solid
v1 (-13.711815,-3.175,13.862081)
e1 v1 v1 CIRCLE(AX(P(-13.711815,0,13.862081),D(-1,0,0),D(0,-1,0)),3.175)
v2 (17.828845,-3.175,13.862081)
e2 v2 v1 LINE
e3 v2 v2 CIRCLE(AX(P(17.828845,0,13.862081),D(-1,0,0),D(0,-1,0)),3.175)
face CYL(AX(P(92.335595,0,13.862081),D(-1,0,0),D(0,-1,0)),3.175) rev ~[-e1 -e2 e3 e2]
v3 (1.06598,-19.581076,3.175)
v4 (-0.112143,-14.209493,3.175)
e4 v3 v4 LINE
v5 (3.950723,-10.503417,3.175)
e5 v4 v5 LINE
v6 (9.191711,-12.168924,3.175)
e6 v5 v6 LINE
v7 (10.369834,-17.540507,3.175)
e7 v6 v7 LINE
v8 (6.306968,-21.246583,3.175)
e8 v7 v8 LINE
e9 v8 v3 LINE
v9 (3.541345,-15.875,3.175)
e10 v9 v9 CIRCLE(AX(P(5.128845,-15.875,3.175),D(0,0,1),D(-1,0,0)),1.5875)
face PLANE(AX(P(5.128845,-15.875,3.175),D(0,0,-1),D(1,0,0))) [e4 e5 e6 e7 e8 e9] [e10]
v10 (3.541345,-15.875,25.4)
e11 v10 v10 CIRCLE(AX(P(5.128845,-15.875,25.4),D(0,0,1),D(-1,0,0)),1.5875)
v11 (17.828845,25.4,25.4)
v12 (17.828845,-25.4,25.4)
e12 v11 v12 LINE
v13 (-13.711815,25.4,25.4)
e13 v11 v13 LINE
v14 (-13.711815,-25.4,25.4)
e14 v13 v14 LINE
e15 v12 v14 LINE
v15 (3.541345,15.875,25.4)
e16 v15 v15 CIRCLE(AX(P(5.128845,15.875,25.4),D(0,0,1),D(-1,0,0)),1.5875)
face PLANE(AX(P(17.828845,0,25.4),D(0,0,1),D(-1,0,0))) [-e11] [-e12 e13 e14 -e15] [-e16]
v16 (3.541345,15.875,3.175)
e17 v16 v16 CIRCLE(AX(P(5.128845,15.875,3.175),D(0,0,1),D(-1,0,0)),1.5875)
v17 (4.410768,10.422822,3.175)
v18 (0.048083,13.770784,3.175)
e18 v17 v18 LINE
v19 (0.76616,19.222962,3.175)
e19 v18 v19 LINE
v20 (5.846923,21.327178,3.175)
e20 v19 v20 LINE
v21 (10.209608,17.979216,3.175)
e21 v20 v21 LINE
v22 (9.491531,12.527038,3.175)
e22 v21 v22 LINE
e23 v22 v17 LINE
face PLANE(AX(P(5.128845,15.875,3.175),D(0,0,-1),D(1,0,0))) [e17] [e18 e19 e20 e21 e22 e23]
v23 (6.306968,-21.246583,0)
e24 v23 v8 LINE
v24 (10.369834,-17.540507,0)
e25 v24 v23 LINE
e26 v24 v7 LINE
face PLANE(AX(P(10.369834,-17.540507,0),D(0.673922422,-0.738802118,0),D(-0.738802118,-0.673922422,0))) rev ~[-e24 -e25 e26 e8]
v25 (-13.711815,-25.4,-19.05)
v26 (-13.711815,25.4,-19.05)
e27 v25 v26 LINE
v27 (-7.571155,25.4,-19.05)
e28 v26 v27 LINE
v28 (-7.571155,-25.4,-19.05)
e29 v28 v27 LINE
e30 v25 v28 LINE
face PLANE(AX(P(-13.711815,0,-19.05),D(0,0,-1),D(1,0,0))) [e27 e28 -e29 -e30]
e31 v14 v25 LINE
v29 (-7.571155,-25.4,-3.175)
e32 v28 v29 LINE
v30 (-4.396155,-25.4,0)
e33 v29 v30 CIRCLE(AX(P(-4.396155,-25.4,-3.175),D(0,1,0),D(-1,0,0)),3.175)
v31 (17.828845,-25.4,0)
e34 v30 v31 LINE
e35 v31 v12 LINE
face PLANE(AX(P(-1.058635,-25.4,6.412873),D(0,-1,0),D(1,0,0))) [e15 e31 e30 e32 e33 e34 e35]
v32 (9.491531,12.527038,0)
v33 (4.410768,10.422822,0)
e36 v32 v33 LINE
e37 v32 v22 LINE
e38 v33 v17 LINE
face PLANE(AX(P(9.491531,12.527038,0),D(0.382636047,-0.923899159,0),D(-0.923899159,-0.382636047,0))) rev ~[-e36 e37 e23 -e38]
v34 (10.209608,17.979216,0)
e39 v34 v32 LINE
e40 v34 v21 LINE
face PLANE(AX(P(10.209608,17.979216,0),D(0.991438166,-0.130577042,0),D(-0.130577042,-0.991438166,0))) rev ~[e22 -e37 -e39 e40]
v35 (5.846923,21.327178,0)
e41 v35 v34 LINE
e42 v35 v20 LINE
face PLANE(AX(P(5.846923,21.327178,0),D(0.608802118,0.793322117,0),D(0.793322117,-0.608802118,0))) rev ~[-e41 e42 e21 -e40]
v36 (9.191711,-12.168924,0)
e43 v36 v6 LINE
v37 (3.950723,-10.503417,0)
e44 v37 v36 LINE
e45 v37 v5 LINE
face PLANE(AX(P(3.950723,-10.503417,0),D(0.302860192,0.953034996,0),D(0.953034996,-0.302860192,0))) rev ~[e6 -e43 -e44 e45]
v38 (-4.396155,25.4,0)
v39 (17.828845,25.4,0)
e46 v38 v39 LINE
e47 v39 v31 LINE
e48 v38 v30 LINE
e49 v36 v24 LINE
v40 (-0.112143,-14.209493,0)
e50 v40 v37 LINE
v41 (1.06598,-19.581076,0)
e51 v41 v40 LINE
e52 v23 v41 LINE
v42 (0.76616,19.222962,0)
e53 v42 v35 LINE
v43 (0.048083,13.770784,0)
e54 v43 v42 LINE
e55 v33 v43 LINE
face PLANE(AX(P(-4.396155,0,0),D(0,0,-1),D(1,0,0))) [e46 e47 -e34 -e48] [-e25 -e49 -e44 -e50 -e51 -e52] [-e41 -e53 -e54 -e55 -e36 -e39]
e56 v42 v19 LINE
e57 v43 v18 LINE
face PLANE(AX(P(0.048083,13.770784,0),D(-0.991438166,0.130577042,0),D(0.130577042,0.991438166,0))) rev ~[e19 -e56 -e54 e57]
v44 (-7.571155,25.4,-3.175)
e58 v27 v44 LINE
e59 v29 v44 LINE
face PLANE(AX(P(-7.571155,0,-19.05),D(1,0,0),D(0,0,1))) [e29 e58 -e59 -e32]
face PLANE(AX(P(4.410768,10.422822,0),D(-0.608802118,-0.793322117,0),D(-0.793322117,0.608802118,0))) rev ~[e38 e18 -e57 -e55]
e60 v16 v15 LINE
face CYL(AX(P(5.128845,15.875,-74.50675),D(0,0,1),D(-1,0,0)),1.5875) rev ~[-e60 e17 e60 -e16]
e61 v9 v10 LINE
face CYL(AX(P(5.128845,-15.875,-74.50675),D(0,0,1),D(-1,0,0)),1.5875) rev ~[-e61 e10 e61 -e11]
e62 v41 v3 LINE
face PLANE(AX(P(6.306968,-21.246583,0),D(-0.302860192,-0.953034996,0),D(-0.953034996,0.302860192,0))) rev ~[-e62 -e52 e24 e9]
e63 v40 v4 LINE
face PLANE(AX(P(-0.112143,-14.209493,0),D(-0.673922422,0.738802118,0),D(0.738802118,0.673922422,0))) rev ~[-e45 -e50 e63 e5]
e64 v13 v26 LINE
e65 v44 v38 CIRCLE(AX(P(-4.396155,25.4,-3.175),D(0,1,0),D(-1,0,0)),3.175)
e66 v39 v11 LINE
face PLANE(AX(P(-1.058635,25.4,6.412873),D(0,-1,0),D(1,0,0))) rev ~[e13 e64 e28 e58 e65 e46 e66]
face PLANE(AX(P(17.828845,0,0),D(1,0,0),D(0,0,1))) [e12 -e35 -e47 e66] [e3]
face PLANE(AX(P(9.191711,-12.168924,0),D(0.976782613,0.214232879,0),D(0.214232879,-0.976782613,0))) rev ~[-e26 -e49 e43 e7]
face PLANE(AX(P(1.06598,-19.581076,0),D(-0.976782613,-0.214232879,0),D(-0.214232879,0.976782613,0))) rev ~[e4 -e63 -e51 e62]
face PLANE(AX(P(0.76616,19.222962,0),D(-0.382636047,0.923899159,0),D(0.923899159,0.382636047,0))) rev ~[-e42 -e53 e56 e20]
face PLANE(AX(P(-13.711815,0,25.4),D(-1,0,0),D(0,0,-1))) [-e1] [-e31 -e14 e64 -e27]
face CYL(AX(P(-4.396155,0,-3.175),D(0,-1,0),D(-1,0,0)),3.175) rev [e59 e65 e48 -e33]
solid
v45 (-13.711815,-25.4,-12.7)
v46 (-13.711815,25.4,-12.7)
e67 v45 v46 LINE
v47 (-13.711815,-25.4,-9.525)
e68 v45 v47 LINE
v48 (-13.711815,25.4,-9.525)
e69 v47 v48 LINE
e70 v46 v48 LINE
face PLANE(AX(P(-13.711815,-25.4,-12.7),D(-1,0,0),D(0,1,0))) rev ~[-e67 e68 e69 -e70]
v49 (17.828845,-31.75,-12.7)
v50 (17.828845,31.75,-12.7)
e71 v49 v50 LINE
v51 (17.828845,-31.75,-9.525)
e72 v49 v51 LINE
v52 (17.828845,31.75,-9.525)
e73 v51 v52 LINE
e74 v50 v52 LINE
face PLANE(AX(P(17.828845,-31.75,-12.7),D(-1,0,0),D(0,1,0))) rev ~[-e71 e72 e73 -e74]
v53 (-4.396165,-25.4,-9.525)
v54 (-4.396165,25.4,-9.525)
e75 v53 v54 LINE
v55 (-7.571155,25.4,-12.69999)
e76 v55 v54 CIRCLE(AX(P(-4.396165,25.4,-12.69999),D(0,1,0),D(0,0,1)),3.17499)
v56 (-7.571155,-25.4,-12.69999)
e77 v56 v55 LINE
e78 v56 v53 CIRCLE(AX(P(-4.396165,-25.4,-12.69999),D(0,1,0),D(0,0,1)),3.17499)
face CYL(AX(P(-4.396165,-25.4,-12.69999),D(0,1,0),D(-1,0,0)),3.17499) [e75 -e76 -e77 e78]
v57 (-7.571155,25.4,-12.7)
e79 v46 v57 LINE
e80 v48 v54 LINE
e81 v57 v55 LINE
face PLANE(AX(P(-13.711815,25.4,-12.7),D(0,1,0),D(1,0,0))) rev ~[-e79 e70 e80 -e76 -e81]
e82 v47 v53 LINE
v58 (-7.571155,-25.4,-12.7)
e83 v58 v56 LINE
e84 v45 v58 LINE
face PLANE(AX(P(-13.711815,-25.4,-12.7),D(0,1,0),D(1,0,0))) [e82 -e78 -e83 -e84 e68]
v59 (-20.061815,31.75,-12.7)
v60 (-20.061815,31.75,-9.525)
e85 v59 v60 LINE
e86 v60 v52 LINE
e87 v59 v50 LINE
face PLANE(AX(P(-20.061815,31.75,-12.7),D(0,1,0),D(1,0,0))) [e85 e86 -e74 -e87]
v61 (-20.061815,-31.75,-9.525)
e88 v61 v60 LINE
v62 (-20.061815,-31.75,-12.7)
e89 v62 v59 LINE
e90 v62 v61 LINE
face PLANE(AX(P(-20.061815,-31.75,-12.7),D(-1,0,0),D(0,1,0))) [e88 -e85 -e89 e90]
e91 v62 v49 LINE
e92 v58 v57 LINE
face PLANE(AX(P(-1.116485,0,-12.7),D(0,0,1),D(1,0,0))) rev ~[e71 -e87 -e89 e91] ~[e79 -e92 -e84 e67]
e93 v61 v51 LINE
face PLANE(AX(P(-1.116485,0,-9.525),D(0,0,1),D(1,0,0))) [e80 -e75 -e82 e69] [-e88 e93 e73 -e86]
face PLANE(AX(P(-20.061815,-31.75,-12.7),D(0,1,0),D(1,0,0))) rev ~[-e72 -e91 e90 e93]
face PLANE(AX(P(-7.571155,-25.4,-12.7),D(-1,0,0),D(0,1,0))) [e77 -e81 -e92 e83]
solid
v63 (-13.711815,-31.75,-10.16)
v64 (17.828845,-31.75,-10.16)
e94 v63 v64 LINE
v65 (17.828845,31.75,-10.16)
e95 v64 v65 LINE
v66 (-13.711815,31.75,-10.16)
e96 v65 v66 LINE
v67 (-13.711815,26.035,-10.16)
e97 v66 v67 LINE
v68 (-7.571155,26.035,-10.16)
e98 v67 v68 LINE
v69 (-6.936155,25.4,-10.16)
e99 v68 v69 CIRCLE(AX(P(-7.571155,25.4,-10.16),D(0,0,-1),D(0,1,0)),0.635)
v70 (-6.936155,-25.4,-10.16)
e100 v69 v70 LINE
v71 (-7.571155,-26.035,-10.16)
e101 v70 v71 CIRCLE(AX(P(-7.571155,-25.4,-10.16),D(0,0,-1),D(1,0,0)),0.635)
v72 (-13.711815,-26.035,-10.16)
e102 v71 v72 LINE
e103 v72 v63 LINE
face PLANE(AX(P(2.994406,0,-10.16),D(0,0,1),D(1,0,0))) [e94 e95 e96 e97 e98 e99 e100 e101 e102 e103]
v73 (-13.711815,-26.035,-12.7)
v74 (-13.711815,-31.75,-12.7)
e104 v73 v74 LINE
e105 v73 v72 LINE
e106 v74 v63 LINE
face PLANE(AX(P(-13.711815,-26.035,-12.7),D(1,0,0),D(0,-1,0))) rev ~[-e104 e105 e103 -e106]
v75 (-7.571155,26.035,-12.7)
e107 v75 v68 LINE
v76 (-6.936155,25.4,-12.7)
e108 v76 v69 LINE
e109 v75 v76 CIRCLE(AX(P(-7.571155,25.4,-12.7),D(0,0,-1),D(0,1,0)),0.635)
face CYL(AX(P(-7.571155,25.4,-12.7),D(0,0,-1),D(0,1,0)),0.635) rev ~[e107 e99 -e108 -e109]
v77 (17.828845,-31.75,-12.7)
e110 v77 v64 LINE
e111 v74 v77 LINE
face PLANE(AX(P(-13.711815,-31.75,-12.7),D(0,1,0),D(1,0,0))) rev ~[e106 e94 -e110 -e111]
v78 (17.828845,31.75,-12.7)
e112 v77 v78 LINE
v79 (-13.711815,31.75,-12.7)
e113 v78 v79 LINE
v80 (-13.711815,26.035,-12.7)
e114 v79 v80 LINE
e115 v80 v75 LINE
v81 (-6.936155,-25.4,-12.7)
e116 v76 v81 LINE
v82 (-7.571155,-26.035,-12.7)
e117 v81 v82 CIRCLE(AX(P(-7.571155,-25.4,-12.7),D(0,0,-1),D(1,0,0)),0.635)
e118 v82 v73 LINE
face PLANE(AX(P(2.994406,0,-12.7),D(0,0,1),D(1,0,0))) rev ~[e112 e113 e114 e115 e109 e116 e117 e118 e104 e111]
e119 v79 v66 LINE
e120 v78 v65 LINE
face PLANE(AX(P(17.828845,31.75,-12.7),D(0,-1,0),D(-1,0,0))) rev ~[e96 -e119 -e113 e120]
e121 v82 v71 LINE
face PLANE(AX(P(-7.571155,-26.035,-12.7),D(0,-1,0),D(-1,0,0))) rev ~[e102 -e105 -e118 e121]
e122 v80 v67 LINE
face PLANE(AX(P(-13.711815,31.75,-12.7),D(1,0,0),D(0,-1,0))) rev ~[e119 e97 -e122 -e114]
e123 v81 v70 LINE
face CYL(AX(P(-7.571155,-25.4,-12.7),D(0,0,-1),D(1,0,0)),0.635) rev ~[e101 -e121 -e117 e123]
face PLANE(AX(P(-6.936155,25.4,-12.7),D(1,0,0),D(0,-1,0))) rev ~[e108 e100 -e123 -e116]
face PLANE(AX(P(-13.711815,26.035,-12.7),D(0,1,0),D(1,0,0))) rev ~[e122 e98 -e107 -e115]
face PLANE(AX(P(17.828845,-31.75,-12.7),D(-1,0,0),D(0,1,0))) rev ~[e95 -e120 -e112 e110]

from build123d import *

# Parameters (mm, degrees)
F1_DEPTH  = 25.4
F3_D      = 6.35
F6_DEPTH  = 3.175
F7_D      = 3.175
F10_DEPTH = 2.54
F11_W     = 37.8906604153
F11_H     = 63.5
F11_W_2   = 6.1406604153
F11_H_2   = 50.8
F12_DEPTH = 3.175
F13_R     = 3.17499


# Not quite as in the source:
# - a fillet or chamfer is up to 0.001 mm smaller than in the source, because OpenCascade refuses the exact size


with BuildPart() as f1:
    # F0 (on Front) → F1 (new body, symmetric)
    with BuildSketch(Plane.XZ):
        with BuildLine():
            ThreePointArc((-7.5711545896, -3.175), (-6.6412186199, -0.9299359697), (-4.3961545896, 0))
            Line((-4.3961545896, 0), (17.8288454104, 0))
            Line((17.8288454104, 0), (17.8288454104, 25.4))
            Line((17.8288454104, 25.4), (-13.7118150049, 25.4))
            Line((-13.7118150049, 25.4), (-13.7118150049, -19.05))
            Line((-13.7118150049, -19.05), (-7.5711545896, -19.05))
            Line((-7.5711545896, -19.05), (-7.5711545896, -3.175))
        make_face()
    extrude(amount=F1_DEPTH, both=True)

    # F3 (through all)
    with Locations(Plane.YZ.offset(17.8288454104)):
        with Locations((0, 13.8620808721)):
            Hole(F3_D / 2)

    # F5 (on face) → F6 (cut)
    with BuildSketch(Plane(origin=(0, 0, 0), x_dir=(1, 0, 0), z_dir=(0, 0, -1))):
        Polygon((3.950722829, 10.5034171622), (9.1917113157, 12.1689244969), (10.3698338971, 17.5405073346), (6.3069679918, 21.2465828378), (1.065979505, 19.5810755031), (-0.1121430764, 14.2094926654), align=None)
        Polygon((0.7661597851, -19.2229619375), (5.8469226865, -21.327177549), (10.2096083118, -17.9792156115), (9.4915310357, -12.5270380625), (4.4107681342, -10.422822451), (0.048082509, -13.7707843885), align=None)
    extrude(amount=-F6_DEPTH, mode=Mode.SUBTRACT)

    # F7 (through all)
    with Locations(Plane(origin=(0, 0, 0), x_dir=(1, 0, 0), z_dir=(0, 0, -1))):
        with Locations((5.1288454104, -15.875), (5.1288454104, 15.875)):
            Hole(F7_D / 2)


with BuildPart() as f10:
    # F9 (on offset) → F10 (new body)
    with BuildSketch(Plane.XY.offset(-12.7)):
        with BuildLine():
            Line((17.8288454104, -31.75), (17.8288454104, 31.75))
            Line((17.8288454104, 31.75), (-13.7118150049, 31.75))
            Line((-13.7118150049, 31.75), (-13.7118150049, 26.035))
            Line((-13.7118150049, 26.035), (-7.5711545896, 26.035))
            ThreePointArc((-7.5711545896, 26.035), (-7.1221417836, 25.8490128061), (-6.9361545896, 25.4))
            Line((-6.9361545896, 25.4), (-6.9361545896, -25.4))
            ThreePointArc((-6.9361545896, -25.4), (-7.1221417836, -25.8490128061), (-7.5711545896, -26.035))
            Line((-7.5711545896, -26.035), (-13.7118150049, -26.035))
            Line((-13.7118150049, -26.035), (-13.7118150049, -31.75))
            Line((-13.7118150049, -31.75), (17.8288454104, -31.75))
        make_face()
    extrude(amount=F10_DEPTH)


with BuildPart() as f12:
    # F11 (on offset) → F12 (new body)
    with BuildSketch(Plane.XY.offset(-12.7)):
        with Locations((-1.1164847973, 0)):
            Rectangle(F11_W, F11_H)
        with Locations((-10.6414847973, 0)):
            Rectangle(F11_W_2, F11_H_2, mode=Mode.SUBTRACT)
    extrude(amount=F12_DEPTH)

    # F13 (radius 3.175 in the source; OpenCascade refuses exactly that, so slightly less here)
    f13_edges = [f12.edges().sort_by_distance(p)[0] for p in [
        (-7.571155, 0, -9.525),
    ]]
    fillet(f13_edges, radius=F13_R)


solid = Compound([f1.part, f10.part, f12.part])
